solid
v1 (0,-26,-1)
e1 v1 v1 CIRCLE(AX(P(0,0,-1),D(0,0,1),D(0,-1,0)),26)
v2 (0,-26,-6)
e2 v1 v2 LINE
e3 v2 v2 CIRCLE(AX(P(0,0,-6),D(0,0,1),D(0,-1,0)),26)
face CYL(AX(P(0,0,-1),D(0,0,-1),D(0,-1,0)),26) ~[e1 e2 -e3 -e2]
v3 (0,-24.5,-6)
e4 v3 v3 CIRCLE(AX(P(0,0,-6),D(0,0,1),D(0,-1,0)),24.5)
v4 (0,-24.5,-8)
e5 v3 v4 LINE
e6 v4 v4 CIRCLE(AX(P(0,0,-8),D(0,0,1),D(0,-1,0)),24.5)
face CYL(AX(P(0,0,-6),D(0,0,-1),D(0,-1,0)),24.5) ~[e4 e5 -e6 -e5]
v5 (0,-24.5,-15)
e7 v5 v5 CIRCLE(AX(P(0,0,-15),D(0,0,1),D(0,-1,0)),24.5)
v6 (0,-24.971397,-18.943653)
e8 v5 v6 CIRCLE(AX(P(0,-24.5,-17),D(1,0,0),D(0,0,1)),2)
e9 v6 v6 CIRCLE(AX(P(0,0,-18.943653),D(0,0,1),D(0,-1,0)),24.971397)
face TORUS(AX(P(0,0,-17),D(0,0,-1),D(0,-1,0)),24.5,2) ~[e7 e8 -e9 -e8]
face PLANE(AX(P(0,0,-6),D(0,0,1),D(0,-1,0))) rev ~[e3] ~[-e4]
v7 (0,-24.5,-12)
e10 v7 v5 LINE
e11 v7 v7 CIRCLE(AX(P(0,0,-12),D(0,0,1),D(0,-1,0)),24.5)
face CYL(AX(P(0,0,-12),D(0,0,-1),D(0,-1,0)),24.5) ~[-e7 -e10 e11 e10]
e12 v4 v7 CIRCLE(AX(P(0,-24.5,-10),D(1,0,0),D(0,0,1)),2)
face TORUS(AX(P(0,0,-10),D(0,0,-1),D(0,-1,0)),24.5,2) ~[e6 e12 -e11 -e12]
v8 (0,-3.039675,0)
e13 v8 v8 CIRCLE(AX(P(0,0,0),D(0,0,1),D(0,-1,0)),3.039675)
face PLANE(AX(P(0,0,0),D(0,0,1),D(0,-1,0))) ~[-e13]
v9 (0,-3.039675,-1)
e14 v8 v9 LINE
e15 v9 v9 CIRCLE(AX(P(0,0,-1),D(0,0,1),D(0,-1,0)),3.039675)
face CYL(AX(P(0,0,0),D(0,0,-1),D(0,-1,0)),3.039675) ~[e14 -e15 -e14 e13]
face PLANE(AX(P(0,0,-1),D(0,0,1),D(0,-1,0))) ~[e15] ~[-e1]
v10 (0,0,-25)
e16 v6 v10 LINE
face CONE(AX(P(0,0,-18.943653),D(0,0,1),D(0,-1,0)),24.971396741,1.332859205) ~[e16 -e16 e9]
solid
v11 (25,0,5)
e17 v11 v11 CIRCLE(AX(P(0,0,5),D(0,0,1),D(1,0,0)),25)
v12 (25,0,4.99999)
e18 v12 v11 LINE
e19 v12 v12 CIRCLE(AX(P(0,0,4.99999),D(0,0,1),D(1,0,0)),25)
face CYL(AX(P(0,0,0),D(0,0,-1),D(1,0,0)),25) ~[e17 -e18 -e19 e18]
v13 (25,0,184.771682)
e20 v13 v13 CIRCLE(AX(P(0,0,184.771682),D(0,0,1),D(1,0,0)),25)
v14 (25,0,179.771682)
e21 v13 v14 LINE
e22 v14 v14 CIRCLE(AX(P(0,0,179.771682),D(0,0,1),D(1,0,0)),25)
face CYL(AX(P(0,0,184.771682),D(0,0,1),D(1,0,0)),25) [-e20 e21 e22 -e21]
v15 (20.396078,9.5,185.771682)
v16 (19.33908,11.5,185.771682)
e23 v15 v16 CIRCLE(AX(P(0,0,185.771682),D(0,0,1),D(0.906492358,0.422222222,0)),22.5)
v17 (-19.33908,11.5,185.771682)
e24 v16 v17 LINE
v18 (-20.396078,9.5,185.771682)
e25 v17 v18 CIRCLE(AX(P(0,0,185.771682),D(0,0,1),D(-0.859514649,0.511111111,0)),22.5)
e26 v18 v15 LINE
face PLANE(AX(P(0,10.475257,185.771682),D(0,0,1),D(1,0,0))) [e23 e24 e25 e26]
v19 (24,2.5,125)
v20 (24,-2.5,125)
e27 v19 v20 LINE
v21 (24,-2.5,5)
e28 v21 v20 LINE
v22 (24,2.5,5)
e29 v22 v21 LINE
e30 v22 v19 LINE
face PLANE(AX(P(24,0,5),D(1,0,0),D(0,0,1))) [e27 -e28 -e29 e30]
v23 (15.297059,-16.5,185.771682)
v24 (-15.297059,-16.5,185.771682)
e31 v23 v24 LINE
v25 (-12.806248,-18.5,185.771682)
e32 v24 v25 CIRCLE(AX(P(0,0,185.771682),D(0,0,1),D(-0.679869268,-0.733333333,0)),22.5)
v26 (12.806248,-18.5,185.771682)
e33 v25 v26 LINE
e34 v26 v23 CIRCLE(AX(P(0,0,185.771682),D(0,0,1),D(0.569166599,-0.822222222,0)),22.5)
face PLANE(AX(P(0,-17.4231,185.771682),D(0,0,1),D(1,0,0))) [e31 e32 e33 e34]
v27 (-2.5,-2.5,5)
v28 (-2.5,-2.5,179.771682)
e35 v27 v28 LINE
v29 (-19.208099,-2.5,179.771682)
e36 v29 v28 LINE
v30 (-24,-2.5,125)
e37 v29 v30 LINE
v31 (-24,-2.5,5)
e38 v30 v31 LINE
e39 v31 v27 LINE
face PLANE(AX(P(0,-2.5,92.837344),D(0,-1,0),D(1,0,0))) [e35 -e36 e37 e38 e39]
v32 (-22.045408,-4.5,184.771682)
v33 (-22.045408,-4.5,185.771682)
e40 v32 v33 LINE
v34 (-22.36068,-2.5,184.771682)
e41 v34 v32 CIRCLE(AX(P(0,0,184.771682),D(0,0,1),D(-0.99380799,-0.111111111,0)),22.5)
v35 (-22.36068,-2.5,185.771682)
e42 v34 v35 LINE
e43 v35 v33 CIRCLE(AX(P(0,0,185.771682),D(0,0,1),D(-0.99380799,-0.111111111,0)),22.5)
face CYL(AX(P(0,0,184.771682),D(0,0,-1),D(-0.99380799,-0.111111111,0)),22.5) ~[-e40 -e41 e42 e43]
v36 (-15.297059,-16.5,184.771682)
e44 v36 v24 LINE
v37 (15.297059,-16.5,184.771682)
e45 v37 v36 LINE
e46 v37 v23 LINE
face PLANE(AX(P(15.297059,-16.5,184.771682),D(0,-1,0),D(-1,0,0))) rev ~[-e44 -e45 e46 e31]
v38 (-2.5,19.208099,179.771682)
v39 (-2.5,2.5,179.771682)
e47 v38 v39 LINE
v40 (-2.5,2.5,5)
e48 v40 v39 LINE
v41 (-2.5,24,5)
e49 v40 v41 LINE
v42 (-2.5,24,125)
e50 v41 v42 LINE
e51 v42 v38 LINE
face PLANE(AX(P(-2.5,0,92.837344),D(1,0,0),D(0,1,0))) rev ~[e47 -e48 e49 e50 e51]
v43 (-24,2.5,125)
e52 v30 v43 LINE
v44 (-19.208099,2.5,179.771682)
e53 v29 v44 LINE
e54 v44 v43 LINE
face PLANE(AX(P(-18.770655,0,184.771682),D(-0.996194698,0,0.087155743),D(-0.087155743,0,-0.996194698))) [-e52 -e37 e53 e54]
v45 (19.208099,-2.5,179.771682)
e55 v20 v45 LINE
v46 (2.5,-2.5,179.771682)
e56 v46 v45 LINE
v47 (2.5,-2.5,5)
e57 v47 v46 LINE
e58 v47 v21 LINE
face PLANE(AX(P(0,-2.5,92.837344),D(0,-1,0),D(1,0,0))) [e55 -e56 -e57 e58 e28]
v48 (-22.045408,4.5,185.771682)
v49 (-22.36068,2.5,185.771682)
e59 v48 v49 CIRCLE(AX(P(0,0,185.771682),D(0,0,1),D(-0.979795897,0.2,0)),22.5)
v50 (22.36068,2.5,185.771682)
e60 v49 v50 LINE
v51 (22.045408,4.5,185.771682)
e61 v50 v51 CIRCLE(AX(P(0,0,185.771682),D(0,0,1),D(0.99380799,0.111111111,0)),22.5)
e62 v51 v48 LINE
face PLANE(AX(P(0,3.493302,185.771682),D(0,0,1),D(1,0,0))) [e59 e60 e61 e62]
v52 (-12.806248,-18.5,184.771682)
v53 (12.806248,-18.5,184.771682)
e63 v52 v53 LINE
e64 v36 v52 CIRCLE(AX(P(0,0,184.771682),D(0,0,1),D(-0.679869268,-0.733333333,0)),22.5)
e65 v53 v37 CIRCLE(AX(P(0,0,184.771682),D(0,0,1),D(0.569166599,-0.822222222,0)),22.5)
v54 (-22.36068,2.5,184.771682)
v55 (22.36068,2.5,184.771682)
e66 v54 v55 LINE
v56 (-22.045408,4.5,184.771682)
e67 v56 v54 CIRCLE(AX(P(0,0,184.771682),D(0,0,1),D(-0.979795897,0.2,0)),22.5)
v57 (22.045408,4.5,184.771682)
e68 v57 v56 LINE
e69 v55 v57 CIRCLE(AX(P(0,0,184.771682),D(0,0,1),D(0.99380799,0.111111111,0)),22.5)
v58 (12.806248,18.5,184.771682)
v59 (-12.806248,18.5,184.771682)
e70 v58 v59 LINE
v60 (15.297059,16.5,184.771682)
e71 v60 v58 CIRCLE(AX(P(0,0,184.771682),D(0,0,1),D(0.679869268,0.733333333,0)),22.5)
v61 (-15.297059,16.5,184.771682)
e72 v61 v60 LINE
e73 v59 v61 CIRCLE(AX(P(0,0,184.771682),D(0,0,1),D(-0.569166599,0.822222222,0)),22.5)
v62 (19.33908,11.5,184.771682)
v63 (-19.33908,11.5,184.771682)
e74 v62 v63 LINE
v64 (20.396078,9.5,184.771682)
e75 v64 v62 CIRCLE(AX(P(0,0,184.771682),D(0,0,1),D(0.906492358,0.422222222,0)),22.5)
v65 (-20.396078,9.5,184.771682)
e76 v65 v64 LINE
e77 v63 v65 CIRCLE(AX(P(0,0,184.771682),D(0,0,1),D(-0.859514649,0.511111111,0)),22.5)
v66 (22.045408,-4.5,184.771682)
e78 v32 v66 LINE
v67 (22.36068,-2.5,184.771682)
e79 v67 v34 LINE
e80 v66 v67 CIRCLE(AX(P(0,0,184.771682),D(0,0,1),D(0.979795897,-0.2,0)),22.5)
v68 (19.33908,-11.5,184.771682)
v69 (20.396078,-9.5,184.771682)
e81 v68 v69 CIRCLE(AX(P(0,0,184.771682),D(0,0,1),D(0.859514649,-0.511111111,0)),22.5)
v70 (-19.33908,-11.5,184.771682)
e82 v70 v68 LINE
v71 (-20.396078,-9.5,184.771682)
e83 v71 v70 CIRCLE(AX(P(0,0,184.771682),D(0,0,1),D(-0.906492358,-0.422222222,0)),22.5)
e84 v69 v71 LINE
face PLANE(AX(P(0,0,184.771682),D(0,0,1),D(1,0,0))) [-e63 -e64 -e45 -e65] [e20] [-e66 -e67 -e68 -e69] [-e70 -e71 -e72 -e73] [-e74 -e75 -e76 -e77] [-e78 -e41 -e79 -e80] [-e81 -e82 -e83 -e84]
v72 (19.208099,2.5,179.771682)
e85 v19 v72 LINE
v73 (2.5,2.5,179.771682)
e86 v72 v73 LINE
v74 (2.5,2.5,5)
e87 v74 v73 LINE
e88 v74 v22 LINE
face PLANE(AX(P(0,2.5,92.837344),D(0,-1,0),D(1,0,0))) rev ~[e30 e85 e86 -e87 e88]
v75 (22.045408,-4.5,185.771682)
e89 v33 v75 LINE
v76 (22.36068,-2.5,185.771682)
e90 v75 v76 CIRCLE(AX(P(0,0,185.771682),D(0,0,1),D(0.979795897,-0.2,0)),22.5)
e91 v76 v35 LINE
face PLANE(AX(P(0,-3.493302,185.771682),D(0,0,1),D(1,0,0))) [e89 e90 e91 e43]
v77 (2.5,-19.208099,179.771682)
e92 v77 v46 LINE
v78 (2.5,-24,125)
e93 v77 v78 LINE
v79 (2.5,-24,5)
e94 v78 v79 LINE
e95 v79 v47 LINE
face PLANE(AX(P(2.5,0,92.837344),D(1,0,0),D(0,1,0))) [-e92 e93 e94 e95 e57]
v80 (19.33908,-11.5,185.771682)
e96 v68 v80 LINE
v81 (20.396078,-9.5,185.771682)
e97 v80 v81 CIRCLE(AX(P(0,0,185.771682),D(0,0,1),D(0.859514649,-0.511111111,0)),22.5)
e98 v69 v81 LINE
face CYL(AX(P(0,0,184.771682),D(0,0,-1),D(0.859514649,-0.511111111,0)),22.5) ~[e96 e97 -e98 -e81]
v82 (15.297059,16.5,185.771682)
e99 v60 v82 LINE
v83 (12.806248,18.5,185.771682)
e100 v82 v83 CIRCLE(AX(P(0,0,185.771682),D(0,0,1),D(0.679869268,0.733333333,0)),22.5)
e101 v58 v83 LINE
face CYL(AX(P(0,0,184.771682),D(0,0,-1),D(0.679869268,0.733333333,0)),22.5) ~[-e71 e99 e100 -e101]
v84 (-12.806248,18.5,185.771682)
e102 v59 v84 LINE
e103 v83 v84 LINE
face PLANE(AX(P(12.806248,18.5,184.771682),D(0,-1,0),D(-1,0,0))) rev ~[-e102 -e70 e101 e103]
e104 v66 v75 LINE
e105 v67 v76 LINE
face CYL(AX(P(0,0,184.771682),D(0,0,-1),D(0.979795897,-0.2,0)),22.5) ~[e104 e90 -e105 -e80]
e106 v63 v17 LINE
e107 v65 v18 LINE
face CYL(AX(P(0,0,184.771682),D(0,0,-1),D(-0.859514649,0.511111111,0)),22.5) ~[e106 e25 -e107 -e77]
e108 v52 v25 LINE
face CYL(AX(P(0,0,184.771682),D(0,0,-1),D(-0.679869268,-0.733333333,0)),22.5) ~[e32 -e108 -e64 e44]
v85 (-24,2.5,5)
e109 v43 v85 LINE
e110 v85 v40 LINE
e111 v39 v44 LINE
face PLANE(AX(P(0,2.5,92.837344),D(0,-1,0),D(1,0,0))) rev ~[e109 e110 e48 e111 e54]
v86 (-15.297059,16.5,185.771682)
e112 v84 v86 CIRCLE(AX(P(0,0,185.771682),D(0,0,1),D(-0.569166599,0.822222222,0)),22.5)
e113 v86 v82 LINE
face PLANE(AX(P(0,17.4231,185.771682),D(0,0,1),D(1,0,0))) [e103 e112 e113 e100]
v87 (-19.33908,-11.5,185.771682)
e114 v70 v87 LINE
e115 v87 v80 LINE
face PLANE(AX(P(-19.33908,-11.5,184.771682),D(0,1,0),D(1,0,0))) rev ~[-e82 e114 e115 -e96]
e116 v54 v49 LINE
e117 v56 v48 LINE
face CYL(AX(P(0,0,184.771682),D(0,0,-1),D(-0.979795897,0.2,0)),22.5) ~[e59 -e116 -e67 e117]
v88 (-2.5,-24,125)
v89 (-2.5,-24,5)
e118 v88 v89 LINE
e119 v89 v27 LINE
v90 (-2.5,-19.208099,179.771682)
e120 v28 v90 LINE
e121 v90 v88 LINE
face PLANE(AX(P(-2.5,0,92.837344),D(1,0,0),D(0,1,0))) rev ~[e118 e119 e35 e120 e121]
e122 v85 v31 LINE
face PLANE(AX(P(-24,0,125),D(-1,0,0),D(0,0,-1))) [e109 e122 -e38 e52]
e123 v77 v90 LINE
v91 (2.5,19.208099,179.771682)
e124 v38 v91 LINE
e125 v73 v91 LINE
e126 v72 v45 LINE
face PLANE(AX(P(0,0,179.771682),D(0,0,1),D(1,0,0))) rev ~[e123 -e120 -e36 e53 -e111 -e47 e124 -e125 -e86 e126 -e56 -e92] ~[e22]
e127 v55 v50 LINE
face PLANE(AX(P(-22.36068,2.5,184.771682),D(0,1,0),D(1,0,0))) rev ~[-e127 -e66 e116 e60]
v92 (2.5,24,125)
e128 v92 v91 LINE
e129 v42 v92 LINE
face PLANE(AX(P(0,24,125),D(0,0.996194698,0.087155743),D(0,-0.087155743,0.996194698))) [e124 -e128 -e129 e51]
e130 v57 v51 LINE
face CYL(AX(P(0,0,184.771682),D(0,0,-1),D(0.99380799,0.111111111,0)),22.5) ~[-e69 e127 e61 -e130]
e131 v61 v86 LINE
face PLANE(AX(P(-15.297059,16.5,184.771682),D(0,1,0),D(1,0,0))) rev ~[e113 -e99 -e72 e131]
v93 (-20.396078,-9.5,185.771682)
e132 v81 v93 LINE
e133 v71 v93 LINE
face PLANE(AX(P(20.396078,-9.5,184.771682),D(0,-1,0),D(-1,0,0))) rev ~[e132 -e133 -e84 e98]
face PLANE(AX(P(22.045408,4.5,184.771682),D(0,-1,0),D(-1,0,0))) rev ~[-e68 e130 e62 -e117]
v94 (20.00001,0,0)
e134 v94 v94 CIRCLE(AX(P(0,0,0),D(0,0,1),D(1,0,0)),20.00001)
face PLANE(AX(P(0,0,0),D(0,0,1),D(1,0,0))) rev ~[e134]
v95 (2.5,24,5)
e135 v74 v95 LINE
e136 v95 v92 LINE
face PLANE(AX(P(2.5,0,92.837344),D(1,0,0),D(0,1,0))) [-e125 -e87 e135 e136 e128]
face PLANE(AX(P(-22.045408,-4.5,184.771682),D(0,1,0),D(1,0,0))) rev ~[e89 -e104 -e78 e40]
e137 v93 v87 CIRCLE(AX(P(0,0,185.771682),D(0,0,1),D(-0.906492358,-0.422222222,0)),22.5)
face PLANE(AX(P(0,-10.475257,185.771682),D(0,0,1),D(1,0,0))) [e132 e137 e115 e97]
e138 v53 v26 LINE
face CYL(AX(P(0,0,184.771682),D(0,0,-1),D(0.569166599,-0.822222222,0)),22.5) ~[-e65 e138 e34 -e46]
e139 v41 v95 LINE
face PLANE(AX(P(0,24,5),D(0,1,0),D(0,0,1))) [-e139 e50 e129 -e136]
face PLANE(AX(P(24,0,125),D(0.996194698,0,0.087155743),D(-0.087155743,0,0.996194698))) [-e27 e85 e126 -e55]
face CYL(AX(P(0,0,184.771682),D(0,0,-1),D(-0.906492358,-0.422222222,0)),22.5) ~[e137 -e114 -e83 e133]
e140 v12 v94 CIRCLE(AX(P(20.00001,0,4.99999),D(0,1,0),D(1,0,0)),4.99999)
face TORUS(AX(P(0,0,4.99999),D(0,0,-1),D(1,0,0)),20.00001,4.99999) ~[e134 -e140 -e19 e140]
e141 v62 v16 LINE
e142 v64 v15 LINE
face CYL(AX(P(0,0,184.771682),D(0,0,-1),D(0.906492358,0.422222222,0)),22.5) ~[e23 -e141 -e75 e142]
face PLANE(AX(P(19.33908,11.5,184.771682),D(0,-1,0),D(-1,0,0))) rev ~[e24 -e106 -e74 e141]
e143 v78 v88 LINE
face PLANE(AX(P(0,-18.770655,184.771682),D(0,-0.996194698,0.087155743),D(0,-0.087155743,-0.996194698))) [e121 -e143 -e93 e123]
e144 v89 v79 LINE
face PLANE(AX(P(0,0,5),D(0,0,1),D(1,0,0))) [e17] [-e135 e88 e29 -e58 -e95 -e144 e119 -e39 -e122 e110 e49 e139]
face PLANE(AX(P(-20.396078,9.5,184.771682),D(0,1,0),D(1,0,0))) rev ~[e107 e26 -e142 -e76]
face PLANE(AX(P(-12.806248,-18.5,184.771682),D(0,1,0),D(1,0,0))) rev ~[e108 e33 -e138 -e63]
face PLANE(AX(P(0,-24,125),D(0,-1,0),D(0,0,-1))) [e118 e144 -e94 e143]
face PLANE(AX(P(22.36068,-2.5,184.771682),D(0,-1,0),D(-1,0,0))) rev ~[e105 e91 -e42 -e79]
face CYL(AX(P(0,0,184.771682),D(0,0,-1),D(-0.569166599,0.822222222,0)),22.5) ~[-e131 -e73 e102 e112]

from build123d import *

# Parameters (mm, degrees)
F0_R      = 25
F1_DEPTH  = 5
F3_DEPTH  = 2.5
F5_DEPTH  = 2.5
F6_R      = 25
F7_DEPTH  = 5
F10_R     = 4.99999
F12_DEPTH = 1


# Not quite as in the source:
# - a fillet or chamfer is up to 0.001 mm smaller than in the source, because OpenCascade refuses the exact size


with BuildPart() as f1:
    # F0 (on Top) → F1 (new body)
    with BuildSketch(Plane.XY):
        Circle(F0_R)
    extrude(amount=F1_DEPTH)

    # F2 (on Front) → F3 (join, symmetric)
    with BuildSketch(Plane.XZ):
        Polygon((-24, 125), (-24, 5), (24, 5), (24, 125), (18.7706554351, 184.7716818855), (-18.7706554351, 184.7716818855), align=None)
    extrude(amount=F3_DEPTH, both=True)

    # F4 (on Right) → F5 (join, symmetric)
    with BuildSketch(Plane.YZ):
        Polygon((-24, 125), (-24, 5), (24, 5), (24, 125), (18.7706554351, 184.7716818855), (-18.7706554351, 184.7716818855), align=None)
    extrude(amount=F5_DEPTH, both=True)

    # F6 (on face) → F7 (join)
    with BuildSketch(Plane.XY.offset(184.7716818855)):
        Circle(F6_R)
        Polygon((-2.5, -2.5), (-18.7706554351, -2.5), (-18.7706554351, 2.5), (-2.5, 2.5), (-2.5, 18.7706554351), (2.5, 18.7706554351), (2.5, 2.5), (18.7706554351, 2.5), (18.7706554351, -2.5), (2.5, -2.5), (2.5, -18.7706554351), (-2.5, -18.7706554351), align=None, mode=Mode.SUBTRACT)
    extrude(amount=-F7_DEPTH)

    # F10 (radius 5 in the source; OpenCascade refuses exactly that, so slightly less here)
    f10_edges = [f1.edges().sort_by_distance(p)[0] for p in [
        (-25, 0, 0),
    ]]
    fillet(f10_edges, radius=F10_R)

    # F11 (on face) → F12 (join)
    with BuildSketch(Plane.XY.offset(184.7716818855)):
        with BuildLine():
            ThreePointArc((12.8062484749, -18.5), (14.0871915691, -17.5442592803), (15.2970585408, -16.5))
            Line((15.2970585408, -16.5), (-15.2970585408, -16.5))
            ThreePointArc((-15.2970585408, -16.5), (-14.0871915691, -17.5442592803), (-12.8062484749, -18.5))
            Line((-12.8062484749, -18.5), (12.8062484749, -18.5))
        make_face()
        with BuildLine():
            ThreePointArc((19.3390796058, -11.5), (19.8927295405, -10.5132921309), (20.3960780544, -9.5))
            Line((20.3960780544, -9.5), (-20.3960780544, -9.5))
            ThreePointArc((-20.3960780544, -9.5), (-19.8927295405, -10.5132921309), (-19.3390796058, -11.5))
            Line((-19.3390796058, -11.5), (19.3390796058, -11.5))
        make_face()
        with BuildLine():
            ThreePointArc((22.045407685, -4.5), (22.2255517564, -3.5035480763), (22.360679775, -2.5))
            Line((22.360679775, -2.5), (-22.360679775, -2.5))
            ThreePointArc((-22.360679775, -2.5), (-22.2255517564, -3.5035480763), (-22.045407685, -4.5))
            Line((-22.045407685, -4.5), (22.045407685, -4.5))
        make_face()
        with BuildLine():
            Line((-22.360679775, 2.5), (22.360679775, 2.5))
            ThreePointArc((22.360679775, 2.5), (22.2255517564, 3.5035480763), (22.045407685, 4.5))
            Line((22.045407685, 4.5), (-22.045407685, 4.5))
            ThreePointArc((-22.045407685, 4.5), (-22.2255517564, 3.5035480763), (-22.360679775, 2.5))
        make_face()
        with BuildLine():
            Line((-20.3960780544, 9.5), (20.3960780544, 9.5))
            ThreePointArc((20.3960780544, 9.5), (19.8927295405, 10.5132921309), (19.3390796058, 11.5))
            Line((19.3390796058, 11.5), (-19.3390796058, 11.5))
            ThreePointArc((-19.3390796058, 11.5), (-19.8927295405, 10.5132921309), (-20.3960780544, 9.5))
        make_face()
        with BuildLine():
            Line((-15.2970585408, 16.5), (15.2970585408, 16.5))
            ThreePointArc((15.2970585408, 16.5), (14.0871915691, 17.5442592803), (12.8062484749, 18.5))
            Line((12.8062484749, 18.5), (-12.8062484749, 18.5))
            ThreePointArc((-12.8062484749, 18.5), (-14.0871915691, 17.5442592803), (-15.2970585408, 16.5))
        make_face()
    extrude(amount=F12_DEPTH)


with BuildPart() as f9:
    # F8 (on Right) → F9 (revolve)
    with BuildSketch(Plane.YZ):
        with BuildLine():
            Line((0, -25), (0, 0))
            Line((0, 0), (-3.0396745298, 0))
            Line((-3.0396745298, 0), (-3.0396745298, -1))
            Line((-3.0396745298, -1), (-26, -1))
            Line((-26, -1), (-26, -6))
            Line((-26, -6), (-24.5, -6))
            Line((-24.5, -6), (-24.5, -8))
            ThreePointArc((-24.5, -8), (-26.5, -10), (-24.5, -12))
            Line((-24.5, -12), (-24.5, -15))
            ThreePointArc((-24.5, -15), (-26.4858631671, -16.7626237555), (-24.9713967407, -18.9436525185))
            Line((-24.9713967407, -18.9436525185), (0, -25))
        make_face()
    revolve(axis=Axis((0, 0, -12.5), (0, 0, 1)))


solid = Compound([f1.part, f9.part])
